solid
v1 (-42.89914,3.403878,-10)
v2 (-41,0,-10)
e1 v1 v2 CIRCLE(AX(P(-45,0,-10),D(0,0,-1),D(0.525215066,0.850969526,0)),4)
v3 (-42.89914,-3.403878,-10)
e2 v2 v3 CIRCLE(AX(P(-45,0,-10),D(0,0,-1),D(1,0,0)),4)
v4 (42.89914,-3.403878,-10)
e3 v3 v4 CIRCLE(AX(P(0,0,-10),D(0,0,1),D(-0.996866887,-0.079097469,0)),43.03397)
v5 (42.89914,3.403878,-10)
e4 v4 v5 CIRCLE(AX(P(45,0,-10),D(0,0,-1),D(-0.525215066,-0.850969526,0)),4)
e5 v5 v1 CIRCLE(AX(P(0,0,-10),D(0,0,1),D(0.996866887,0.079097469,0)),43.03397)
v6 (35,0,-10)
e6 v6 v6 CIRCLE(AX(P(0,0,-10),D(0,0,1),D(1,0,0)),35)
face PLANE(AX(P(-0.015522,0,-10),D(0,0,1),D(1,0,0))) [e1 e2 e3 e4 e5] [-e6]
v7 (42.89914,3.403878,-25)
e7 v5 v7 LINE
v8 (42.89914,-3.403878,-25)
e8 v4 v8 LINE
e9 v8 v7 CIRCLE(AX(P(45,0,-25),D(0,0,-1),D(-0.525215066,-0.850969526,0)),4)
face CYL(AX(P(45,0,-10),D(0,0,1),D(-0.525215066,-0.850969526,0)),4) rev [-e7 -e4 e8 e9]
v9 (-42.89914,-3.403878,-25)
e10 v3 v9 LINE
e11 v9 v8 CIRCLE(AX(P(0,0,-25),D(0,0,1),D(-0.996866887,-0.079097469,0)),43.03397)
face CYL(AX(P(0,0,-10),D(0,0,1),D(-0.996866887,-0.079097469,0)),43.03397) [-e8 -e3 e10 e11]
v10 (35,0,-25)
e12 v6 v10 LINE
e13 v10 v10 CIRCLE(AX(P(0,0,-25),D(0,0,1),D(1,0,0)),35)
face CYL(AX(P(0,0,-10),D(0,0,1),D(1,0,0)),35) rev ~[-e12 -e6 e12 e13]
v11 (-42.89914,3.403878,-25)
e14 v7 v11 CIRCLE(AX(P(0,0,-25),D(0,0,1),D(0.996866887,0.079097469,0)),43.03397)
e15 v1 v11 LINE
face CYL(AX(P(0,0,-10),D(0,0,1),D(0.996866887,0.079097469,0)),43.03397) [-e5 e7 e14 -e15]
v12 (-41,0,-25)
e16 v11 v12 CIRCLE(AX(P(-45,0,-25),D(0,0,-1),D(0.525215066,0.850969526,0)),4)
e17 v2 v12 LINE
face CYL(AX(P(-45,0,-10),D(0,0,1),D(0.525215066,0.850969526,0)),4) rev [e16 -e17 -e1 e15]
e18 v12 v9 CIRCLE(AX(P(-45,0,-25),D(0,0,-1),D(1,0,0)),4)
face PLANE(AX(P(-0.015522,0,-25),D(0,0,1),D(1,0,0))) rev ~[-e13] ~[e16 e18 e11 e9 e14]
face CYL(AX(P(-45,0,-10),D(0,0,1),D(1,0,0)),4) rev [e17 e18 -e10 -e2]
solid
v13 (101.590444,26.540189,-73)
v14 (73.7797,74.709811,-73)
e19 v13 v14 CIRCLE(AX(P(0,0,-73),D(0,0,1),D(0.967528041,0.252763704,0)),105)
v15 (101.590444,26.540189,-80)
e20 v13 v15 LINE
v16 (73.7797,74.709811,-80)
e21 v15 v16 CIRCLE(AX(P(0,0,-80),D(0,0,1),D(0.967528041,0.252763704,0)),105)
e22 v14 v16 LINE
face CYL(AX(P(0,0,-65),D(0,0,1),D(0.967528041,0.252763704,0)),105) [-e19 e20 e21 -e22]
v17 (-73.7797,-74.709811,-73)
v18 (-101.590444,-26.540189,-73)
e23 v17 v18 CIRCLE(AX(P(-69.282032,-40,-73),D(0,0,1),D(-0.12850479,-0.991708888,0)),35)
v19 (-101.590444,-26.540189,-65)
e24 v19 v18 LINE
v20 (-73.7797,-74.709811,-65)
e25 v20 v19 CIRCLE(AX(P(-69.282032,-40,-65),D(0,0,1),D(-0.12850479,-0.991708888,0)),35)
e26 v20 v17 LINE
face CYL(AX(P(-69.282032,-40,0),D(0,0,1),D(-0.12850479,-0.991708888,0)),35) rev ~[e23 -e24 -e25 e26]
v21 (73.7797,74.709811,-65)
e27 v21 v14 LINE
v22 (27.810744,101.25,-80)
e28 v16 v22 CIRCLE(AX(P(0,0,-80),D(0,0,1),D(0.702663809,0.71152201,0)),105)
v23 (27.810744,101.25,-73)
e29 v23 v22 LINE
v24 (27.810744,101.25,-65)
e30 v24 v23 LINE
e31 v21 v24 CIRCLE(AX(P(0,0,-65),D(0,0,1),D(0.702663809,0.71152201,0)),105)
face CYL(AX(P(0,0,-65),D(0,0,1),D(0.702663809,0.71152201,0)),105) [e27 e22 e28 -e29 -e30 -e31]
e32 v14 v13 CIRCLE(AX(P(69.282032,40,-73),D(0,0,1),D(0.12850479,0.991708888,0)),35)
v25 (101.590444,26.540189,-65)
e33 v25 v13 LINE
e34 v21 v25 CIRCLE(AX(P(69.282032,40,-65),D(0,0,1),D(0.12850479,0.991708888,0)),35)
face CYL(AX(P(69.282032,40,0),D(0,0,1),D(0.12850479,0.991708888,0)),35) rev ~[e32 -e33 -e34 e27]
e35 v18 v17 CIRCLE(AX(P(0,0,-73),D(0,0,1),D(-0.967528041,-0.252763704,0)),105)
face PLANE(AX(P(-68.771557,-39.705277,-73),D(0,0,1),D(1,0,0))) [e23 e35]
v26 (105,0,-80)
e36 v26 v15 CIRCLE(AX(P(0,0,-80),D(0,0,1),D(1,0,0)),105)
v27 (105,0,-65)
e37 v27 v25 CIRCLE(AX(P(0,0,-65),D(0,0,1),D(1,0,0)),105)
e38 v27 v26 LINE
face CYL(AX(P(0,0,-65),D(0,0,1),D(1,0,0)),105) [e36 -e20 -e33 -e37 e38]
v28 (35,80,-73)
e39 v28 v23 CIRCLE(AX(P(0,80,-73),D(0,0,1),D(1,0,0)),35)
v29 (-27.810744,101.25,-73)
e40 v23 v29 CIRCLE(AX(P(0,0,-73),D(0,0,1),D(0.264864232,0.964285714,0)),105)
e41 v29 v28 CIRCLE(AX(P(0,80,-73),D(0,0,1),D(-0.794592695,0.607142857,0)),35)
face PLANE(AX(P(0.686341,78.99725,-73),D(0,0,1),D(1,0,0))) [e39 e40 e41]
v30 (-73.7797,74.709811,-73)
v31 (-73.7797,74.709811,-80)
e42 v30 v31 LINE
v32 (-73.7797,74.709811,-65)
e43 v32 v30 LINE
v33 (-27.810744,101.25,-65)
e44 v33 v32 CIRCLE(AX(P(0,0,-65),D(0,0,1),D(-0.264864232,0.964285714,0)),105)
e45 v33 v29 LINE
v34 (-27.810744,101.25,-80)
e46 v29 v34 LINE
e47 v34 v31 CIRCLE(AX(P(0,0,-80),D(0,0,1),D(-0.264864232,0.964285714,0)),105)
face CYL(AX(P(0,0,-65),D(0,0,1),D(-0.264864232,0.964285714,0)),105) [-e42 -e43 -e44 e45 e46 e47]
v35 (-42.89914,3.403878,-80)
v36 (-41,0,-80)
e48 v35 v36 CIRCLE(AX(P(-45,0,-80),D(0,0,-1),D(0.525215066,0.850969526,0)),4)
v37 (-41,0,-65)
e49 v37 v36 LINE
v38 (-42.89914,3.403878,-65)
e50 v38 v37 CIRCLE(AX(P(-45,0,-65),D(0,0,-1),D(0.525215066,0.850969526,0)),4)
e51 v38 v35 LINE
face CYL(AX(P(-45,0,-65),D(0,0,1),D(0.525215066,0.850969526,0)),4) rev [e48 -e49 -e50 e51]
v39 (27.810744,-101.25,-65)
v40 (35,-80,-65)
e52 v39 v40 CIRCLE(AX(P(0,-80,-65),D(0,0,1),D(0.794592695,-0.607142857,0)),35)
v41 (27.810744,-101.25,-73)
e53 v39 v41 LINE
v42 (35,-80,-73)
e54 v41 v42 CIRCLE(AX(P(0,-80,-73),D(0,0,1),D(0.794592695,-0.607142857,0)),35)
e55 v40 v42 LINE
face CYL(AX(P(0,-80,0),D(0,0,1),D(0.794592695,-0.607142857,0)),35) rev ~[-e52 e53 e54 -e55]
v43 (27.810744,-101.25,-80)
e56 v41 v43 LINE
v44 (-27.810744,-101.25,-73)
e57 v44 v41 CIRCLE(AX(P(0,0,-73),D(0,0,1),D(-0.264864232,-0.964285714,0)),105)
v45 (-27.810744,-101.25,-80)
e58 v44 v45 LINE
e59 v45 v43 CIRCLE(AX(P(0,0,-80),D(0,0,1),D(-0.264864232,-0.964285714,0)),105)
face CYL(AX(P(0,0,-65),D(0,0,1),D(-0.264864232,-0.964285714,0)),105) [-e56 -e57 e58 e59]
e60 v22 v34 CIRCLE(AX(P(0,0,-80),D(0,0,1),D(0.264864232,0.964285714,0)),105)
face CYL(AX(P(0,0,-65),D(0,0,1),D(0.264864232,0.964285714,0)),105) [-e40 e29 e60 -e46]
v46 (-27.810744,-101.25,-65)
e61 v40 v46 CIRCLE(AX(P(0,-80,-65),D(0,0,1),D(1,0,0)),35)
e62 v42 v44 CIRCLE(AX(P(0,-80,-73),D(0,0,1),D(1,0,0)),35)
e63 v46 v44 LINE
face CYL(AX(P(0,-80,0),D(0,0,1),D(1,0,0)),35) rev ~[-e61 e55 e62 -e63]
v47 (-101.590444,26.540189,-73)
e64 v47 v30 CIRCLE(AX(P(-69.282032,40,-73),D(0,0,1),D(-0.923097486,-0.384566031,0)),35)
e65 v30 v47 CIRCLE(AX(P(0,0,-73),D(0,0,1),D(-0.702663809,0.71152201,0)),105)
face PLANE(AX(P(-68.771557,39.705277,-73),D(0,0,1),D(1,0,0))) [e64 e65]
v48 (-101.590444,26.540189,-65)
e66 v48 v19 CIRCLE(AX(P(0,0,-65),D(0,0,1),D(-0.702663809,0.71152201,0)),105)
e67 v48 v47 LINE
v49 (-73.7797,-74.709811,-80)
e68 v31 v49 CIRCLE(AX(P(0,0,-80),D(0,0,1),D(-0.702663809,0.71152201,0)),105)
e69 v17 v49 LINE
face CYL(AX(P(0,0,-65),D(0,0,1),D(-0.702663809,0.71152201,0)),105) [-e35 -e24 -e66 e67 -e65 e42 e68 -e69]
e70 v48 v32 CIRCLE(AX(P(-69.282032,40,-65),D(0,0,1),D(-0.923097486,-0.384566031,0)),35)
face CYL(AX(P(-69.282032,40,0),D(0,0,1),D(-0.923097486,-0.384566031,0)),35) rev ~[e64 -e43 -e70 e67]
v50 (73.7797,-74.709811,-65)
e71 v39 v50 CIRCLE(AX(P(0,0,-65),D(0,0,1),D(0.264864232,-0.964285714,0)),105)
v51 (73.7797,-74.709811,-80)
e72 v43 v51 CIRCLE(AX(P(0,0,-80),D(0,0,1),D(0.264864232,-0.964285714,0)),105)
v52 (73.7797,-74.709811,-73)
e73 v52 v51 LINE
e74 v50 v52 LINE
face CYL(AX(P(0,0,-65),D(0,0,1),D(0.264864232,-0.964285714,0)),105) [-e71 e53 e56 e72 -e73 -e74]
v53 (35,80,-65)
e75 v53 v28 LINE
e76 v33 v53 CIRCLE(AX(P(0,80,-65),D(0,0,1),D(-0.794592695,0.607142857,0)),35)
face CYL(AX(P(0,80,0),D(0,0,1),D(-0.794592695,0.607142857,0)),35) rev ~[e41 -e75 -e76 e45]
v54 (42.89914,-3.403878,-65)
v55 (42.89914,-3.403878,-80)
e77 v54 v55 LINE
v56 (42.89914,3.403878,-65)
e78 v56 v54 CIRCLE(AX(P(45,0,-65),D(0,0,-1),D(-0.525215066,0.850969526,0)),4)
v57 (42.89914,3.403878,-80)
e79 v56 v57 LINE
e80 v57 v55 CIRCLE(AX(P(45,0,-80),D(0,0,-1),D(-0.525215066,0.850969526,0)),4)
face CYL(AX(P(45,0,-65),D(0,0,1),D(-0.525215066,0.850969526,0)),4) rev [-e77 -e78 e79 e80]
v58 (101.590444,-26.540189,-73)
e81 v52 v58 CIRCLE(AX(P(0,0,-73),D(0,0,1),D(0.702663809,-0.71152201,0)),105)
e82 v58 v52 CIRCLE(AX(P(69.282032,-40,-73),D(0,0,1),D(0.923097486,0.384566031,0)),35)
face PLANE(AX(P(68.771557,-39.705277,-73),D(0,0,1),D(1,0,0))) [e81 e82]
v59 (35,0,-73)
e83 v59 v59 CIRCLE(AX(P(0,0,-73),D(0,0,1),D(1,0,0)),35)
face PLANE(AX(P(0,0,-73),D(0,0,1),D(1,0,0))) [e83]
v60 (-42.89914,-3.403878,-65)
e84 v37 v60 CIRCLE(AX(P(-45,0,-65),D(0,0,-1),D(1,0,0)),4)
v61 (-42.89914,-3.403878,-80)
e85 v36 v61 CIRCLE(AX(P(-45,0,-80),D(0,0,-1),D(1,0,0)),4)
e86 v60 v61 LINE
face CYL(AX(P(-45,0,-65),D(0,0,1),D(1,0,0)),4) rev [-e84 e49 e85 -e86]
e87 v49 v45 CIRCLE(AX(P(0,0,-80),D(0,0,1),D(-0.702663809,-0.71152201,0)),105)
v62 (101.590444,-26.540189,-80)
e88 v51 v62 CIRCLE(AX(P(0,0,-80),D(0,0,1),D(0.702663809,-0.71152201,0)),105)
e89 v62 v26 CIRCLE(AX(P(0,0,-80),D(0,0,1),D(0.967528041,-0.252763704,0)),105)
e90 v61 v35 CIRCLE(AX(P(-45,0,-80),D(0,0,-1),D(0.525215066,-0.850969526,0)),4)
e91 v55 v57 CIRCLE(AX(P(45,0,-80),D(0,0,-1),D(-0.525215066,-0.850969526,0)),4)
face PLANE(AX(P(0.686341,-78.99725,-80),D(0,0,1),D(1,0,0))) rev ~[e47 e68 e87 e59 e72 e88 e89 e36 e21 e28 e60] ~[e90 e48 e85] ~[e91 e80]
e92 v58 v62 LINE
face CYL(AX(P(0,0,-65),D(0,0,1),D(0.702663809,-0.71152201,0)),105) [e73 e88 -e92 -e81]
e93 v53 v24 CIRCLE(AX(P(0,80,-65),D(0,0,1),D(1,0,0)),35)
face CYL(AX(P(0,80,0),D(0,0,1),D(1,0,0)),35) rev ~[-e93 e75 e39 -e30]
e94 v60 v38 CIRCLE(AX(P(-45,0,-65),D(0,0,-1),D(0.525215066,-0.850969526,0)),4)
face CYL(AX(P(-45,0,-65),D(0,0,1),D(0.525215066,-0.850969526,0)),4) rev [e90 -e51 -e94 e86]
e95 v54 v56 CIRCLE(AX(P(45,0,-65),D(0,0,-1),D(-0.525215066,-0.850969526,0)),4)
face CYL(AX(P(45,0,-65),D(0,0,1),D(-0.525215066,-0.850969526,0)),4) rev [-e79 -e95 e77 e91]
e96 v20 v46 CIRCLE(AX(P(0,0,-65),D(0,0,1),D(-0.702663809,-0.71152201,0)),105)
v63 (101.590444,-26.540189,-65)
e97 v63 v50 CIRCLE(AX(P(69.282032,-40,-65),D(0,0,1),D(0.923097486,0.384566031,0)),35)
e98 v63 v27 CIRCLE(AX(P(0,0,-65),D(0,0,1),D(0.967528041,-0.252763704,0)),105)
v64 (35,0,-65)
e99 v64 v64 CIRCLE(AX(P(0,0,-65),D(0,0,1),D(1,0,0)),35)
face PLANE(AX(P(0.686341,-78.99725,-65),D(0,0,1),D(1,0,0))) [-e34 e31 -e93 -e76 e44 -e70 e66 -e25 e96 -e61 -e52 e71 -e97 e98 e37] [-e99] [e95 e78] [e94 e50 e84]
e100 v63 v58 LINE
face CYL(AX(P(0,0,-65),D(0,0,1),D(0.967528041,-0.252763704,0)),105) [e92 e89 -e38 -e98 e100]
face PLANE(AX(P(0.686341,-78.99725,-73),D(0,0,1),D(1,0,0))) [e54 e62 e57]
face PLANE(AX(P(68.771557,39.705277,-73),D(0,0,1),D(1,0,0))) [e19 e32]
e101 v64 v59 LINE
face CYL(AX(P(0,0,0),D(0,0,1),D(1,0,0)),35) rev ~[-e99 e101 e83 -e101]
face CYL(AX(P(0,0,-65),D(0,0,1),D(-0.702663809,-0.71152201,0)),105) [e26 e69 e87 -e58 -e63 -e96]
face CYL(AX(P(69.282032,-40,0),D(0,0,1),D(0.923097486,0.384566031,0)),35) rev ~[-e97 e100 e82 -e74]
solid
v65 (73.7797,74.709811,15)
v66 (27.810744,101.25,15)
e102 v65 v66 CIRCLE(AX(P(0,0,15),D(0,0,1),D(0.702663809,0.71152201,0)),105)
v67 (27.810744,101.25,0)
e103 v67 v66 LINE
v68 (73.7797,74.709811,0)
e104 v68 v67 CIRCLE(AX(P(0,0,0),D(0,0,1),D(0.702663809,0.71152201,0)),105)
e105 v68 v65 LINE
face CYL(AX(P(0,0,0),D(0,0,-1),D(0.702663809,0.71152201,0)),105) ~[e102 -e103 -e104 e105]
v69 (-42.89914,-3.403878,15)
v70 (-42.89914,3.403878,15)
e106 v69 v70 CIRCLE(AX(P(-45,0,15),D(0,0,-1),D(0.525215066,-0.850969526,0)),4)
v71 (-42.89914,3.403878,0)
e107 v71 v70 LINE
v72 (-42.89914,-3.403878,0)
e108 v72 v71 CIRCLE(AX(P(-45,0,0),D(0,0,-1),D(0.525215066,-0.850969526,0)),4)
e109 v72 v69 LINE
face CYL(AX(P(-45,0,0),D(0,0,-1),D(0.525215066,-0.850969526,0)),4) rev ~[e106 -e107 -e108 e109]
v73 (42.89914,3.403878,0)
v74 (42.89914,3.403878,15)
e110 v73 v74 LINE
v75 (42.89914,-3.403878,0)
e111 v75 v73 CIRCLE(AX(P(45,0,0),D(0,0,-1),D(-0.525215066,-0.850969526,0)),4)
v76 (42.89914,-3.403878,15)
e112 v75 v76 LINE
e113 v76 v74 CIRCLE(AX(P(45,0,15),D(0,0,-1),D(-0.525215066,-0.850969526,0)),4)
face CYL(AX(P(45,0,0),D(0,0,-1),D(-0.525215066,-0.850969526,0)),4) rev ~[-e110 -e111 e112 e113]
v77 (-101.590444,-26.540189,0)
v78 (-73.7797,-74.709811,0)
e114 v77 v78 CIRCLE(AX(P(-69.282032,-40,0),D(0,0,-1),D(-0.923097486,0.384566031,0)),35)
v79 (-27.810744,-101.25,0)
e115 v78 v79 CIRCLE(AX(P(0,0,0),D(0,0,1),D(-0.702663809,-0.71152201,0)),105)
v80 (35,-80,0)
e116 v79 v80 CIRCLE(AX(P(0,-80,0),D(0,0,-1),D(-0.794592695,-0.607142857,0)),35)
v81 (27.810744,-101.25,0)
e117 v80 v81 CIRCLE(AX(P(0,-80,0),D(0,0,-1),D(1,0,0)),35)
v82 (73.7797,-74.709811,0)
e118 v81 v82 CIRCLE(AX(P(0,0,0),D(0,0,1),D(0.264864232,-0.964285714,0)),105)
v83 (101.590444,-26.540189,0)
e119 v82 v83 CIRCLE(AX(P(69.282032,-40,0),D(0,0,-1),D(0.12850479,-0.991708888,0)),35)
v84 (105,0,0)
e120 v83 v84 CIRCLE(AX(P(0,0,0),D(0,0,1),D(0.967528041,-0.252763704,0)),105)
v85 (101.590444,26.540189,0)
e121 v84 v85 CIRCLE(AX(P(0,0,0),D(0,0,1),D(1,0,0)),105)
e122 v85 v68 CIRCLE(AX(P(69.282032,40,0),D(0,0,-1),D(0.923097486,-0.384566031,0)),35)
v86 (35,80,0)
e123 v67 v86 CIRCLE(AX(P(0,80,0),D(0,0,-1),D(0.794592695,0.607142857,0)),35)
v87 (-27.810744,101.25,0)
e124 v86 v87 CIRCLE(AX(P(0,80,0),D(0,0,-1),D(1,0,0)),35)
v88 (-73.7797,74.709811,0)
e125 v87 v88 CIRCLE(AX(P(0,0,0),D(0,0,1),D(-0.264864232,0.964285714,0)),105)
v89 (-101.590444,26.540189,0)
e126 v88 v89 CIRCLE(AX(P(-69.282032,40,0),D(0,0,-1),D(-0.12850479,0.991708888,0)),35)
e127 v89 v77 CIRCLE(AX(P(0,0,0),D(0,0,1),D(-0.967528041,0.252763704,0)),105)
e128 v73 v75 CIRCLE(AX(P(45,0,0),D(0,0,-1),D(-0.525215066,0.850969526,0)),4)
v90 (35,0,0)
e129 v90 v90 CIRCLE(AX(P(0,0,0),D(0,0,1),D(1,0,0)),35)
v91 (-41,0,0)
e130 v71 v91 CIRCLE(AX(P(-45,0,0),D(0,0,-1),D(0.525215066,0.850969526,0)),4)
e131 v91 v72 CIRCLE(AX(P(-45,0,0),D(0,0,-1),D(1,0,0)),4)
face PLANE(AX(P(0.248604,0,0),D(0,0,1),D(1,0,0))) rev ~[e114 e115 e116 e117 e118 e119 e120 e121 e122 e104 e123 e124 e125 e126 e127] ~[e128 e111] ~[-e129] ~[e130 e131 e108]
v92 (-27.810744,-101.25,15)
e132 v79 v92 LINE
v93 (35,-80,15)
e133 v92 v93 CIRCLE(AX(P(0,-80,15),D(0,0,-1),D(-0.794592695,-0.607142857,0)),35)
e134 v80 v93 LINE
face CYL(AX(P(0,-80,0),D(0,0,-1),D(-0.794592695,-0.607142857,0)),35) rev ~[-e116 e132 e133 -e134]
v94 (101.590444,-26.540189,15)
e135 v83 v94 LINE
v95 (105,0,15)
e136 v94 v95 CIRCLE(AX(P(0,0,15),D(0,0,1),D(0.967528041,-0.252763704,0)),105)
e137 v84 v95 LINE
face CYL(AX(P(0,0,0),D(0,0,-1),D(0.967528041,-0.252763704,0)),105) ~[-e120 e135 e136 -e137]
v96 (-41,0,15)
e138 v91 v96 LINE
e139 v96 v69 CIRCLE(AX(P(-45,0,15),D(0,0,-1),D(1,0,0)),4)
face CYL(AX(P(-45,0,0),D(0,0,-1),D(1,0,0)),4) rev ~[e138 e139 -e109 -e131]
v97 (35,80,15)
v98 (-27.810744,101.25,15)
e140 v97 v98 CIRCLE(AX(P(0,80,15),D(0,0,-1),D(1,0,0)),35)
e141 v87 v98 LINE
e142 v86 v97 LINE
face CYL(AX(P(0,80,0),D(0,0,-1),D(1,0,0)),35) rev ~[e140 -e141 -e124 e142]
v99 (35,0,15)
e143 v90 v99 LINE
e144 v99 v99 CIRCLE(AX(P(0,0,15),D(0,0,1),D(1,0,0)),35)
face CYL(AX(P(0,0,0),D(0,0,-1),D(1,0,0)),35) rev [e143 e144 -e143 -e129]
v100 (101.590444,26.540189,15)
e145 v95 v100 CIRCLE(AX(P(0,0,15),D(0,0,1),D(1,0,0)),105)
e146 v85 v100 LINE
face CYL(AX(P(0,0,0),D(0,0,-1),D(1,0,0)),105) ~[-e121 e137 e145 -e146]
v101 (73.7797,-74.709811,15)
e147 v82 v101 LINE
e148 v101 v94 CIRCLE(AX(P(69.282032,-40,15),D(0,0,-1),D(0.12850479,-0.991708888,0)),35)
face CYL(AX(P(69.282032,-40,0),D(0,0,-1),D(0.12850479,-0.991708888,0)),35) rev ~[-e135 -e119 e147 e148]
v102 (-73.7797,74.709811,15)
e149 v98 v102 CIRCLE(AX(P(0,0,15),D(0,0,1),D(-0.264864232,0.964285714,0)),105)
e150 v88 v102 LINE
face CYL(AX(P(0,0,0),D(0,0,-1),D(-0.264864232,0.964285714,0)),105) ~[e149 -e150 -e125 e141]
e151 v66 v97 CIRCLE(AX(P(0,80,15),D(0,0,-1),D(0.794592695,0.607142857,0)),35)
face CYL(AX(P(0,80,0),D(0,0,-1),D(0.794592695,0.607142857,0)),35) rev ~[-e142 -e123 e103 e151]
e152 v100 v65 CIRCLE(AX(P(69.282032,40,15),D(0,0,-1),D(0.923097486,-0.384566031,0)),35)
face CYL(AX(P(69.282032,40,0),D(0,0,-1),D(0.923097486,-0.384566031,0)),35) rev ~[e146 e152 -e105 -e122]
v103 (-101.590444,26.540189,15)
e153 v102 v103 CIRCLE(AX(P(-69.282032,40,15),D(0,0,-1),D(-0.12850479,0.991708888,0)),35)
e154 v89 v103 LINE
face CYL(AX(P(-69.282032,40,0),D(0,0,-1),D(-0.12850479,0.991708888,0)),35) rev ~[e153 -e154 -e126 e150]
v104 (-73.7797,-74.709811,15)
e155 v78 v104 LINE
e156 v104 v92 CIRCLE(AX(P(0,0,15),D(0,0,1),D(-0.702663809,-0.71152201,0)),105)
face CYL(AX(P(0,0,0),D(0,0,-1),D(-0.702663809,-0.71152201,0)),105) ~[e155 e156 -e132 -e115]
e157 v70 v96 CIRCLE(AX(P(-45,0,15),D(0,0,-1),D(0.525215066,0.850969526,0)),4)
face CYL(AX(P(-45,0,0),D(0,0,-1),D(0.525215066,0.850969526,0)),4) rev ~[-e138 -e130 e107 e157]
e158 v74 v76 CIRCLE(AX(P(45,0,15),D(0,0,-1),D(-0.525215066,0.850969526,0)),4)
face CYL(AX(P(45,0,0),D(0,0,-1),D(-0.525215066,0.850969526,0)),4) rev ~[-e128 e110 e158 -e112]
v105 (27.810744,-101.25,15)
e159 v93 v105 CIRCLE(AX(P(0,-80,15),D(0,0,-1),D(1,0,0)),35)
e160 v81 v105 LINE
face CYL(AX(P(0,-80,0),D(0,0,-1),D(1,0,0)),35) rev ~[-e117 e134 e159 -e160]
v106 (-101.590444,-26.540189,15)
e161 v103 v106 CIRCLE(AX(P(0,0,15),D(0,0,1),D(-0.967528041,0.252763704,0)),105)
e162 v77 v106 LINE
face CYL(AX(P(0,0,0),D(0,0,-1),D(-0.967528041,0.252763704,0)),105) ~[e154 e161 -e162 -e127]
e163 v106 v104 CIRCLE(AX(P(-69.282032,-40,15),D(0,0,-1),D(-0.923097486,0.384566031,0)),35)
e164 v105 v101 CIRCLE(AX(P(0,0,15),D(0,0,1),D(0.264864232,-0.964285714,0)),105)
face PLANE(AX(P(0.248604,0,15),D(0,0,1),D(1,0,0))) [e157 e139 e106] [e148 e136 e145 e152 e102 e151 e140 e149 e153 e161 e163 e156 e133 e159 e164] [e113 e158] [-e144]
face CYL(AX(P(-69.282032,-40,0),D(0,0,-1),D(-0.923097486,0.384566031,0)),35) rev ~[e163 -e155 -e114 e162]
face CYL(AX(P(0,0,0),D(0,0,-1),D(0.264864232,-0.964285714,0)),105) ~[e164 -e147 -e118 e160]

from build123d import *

# Parameters (mm, degrees)
F0_R     = 35
F1_DEPTH = 15
F2_START = -65
F2_DEPTH = 15
F3_DEPTH = 73
F4_START = -10
F4_DEPTH = 15


with BuildPart() as f1:
    # F0 (on Top) → F1 (new body)
    with BuildSketch(Plane.XY):
        with BuildLine():
            ThreePointArc((-27.8107443266, -101.25), (-11.2165937024, -46.8459953291), (35, -80))
            ThreePointArc((35, -80), (33.1540046709, -91.2165937024), (27.8107443266, -101.25))
            ThreePointArc((27.8107443266, -101.25), (52.5, -90.9326673974), (73.7796999699, -74.709811085))
            ThreePointArc((73.7796999699, -74.709811085), (38.9711431703, -22.5), (101.5904442965, -26.540188915))
            ThreePointArc((101.5904442965, -26.540188915), (104.1441228566, -13.3791507367), (105, 0))
            ThreePointArc((105, 0), (104.1441228566, 13.3791507367), (101.5904442965, 26.540188915))
            ThreePointArc((101.5904442965, 26.540188915), (38.9711431703, 22.5), (73.7796999699, 74.709811085))
            ThreePointArc((73.7796999699, 74.709811085), (52.5, 90.9326673974), (27.8107443266, 101.25))
            ThreePointArc((27.8107443266, 101.25), (33.1540046709, 91.2165937024), (35, 80))
            ThreePointArc((35, 80), (-11.2165937024, 46.8459953291), (-27.8107443266, 101.25))
            ThreePointArc((-27.8107443266, 101.25), (-52.5, 90.9326673974), (-73.7796999699, 74.709811085))
            ThreePointArc((-73.7796999699, 74.709811085), (-46.1781188718, 66.2908574256), (-34.2820323028, 40))
            ThreePointArc((-34.2820323028, 40), (-62.4188850575, 5.6794928667), (-101.5904442965, 26.540188915))
            ThreePointArc((-101.5904442965, 26.540188915), (-105, 0), (-101.5904442965, -26.540188915))
            ThreePointArc((-101.5904442965, -26.540188915), (-62.4188850575, -5.6794928667), (-34.2820323028, -40))
            ThreePointArc((-34.2820323028, -40), (-46.1781188718, -66.2908574256), (-73.7796999699, -74.709811085))
            ThreePointArc((-73.7796999699, -74.709811085), (-52.5, -90.9326673974), (-27.8107443266, -101.25))
        make_face()
        with BuildLine():
            ThreePointArc((-42.8991397367, -3.403878105), (-49, 0), (-42.8991397367, 3.403878105))
            ThreePointArc((-42.8991397367, 3.403878105), (0, 43.0339700272), (42.8991397367, 3.403878105))
            ThreePointArc((42.8991397367, 3.403878105), (46.9489175132, 3.4930961233), (49, 0))
            ThreePointArc((49, 0), (46.9489175132, -3.4930961233), (42.8991397367, -3.403878105))
            ThreePointArc((42.8991397367, -3.403878105), (0, -43.0339700272), (-42.8991397367, -3.403878105))
        make_face(mode=Mode.SUBTRACT)
        with BuildLine():
            ThreePointArc((-42.8991397367, 3.403878105), (-41.5069038767, 1.9489175132), (-41, 0))
            ThreePointArc((-41, 0), (-41.5069038767, -1.9489175132), (-42.8991397367, -3.403878105))
            ThreePointArc((-42.8991397367, -3.403878105), (0, -43.0339700272), (42.8991397367, -3.403878105))
            ThreePointArc((42.8991397367, -3.403878105), (41, 0), (42.8991397367, 3.403878105))
            ThreePointArc((42.8991397367, 3.403878105), (0, 43.0339700272), (-42.8991397367, 3.403878105))
        make_face()
        Circle(F0_R, mode=Mode.SUBTRACT)
    extrude(amount=F1_DEPTH)


with BuildPart() as f2:
    # F0 (on Top) → F2 (new body)
    with BuildSketch(Plane.XY.offset(F2_START)):
        with BuildLine():
            ThreePointArc((27.8107443266, -101.25), (33.1540046709, -91.2165937024), (35, -80))
            ThreePointArc((35, -80), (-11.2165937024, -46.8459953291), (-27.8107443266, -101.25))
            ThreePointArc((-27.8107443266, -101.25), (0, -105), (27.8107443266, -101.25))
        make_face()
        with BuildLine():
            ThreePointArc((-27.8107443266, -101.25), (-11.2165937024, -46.8459953291), (35, -80))
            ThreePointArc((35, -80), (33.1540046709, -91.2165937024), (27.8107443266, -101.25))
            ThreePointArc((27.8107443266, -101.25), (52.5, -90.9326673974), (73.7796999699, -74.709811085))
            ThreePointArc((73.7796999699, -74.709811085), (38.9711431703, -22.5), (101.5904442965, -26.540188915))
            ThreePointArc((101.5904442965, -26.540188915), (104.1441228566, -13.3791507367), (105, 0))
            ThreePointArc((105, 0), (104.1441228566, 13.3791507367), (101.5904442965, 26.540188915))
            ThreePointArc((101.5904442965, 26.540188915), (38.9711431703, 22.5), (73.7796999699, 74.709811085))
            ThreePointArc((73.7796999699, 74.709811085), (52.5, 90.9326673974), (27.8107443266, 101.25))
            ThreePointArc((27.8107443266, 101.25), (33.1540046709, 91.2165937024), (35, 80))
            ThreePointArc((35, 80), (-11.2165937024, 46.8459953291), (-27.8107443266, 101.25))
            ThreePointArc((-27.8107443266, 101.25), (-52.5, 90.9326673974), (-73.7796999699, 74.709811085))
            ThreePointArc((-73.7796999699, 74.709811085), (-46.1781188718, 66.2908574256), (-34.2820323028, 40))
            ThreePointArc((-34.2820323028, 40), (-62.4188850575, 5.6794928667), (-101.5904442965, 26.540188915))
            ThreePointArc((-101.5904442965, 26.540188915), (-105, 0), (-101.5904442965, -26.540188915))
            ThreePointArc((-101.5904442965, -26.540188915), (-62.4188850575, -5.6794928667), (-34.2820323028, -40))
            ThreePointArc((-34.2820323028, -40), (-46.1781188718, -66.2908574256), (-73.7796999699, -74.709811085))
            ThreePointArc((-73.7796999699, -74.709811085), (-52.5, -90.9326673974), (-27.8107443266, -101.25))
        make_face()
        with BuildLine():
            ThreePointArc((-42.8991397367, -3.403878105), (-49, 0), (-42.8991397367, 3.403878105))
            ThreePointArc((-42.8991397367, 3.403878105), (0, 43.0339700272), (42.8991397367, 3.403878105))
            ThreePointArc((42.8991397367, 3.403878105), (46.9489175132, 3.4930961233), (49, 0))
            ThreePointArc((49, 0), (46.9489175132, -3.4930961233), (42.8991397367, -3.403878105))
            ThreePointArc((42.8991397367, -3.403878105), (0, -43.0339700272), (-42.8991397367, -3.403878105))
        make_face(mode=Mode.SUBTRACT)
        with BuildLine():
            ThreePointArc((-101.5904442965, -26.540188915), (-90.9326673974, -52.5), (-73.7796999699, -74.709811085))
            ThreePointArc((-73.7796999699, -74.709811085), (-46.1781188718, -66.2908574256), (-34.2820323028, -40))
            ThreePointArc((-34.2820323028, -40), (-62.4188850575, -5.6794928667), (-101.5904442965, -26.540188915))
        make_face()
        with BuildLine():
            ThreePointArc((101.5904442965, -26.540188915), (38.9711431703, -22.5), (73.7796999699, -74.709811085))
            ThreePointArc((73.7796999699, -74.709811085), (90.9326673974, -52.5), (101.5904442965, -26.540188915))
        make_face()
        with BuildLine():
            ThreePointArc((-73.7796999699, 74.709811085), (-90.9326673974, 52.5), (-101.5904442965, 26.540188915))
            ThreePointArc((-101.5904442965, 26.540188915), (-62.4188850575, 5.6794928667), (-34.2820323028, 40))
            ThreePointArc((-34.2820323028, 40), (-46.1781188718, 66.2908574256), (-73.7796999699, 74.709811085))
        make_face()
        with BuildLine():
            ThreePointArc((73.7796999699, 74.709811085), (38.9711431703, 22.5), (101.5904442965, 26.540188915))
            ThreePointArc((101.5904442965, 26.540188915), (90.9326673974, 52.5), (73.7796999699, 74.709811085))
        make_face()
        with BuildLine():
            ThreePointArc((27.8107443266, 101.25), (0, 105), (-27.8107443266, 101.25))
            ThreePointArc((-27.8107443266, 101.25), (-11.2165937024, 46.8459953291), (35, 80))
            ThreePointArc((35, 80), (33.1540046709, 91.2165937024), (27.8107443266, 101.25))
        make_face()
        with BuildLine():
            ThreePointArc((-42.8991397367, 3.403878105), (-41.5069038767, 1.9489175132), (-41, 0))
            ThreePointArc((-41, 0), (-41.5069038767, -1.9489175132), (-42.8991397367, -3.403878105))
            ThreePointArc((-42.8991397367, -3.403878105), (0, -43.0339700272), (42.8991397367, -3.403878105))
            ThreePointArc((42.8991397367, -3.403878105), (41, 0), (42.8991397367, 3.403878105))
            ThreePointArc((42.8991397367, 3.403878105), (0, 43.0339700272), (-42.8991397367, 3.403878105))
        make_face()
        Circle(F0_R, mode=Mode.SUBTRACT)
        Circle(F0_R)
    extrude(amount=-F2_DEPTH)

    # F0 (on Top) → F3 (cut)
    with BuildSketch(Plane.XY):
        with BuildLine():
            ThreePointArc((-101.5904442965, -26.540188915), (-90.9326673974, -52.5), (-73.7796999699, -74.709811085))
            ThreePointArc((-73.7796999699, -74.709811085), (-46.1781188718, -66.2908574256), (-34.2820323028, -40))
            ThreePointArc((-34.2820323028, -40), (-62.4188850575, -5.6794928667), (-101.5904442965, -26.540188915))
        make_face()
        with BuildLine():
            ThreePointArc((-73.7796999699, 74.709811085), (-90.9326673974, 52.5), (-101.5904442965, 26.540188915))
            ThreePointArc((-101.5904442965, 26.540188915), (-62.4188850575, 5.6794928667), (-34.2820323028, 40))
            ThreePointArc((-34.2820323028, 40), (-46.1781188718, 66.2908574256), (-73.7796999699, 74.709811085))
        make_face()
        with BuildLine():
            ThreePointArc((27.8107443266, 101.25), (0, 105), (-27.8107443266, 101.25))
            ThreePointArc((-27.8107443266, 101.25), (-11.2165937024, 46.8459953291), (35, 80))
            ThreePointArc((35, 80), (33.1540046709, 91.2165937024), (27.8107443266, 101.25))
        make_face()
        with BuildLine():
            ThreePointArc((73.7796999699, 74.709811085), (38.9711431703, 22.5), (101.5904442965, 26.540188915))
            ThreePointArc((101.5904442965, 26.540188915), (90.9326673974, 52.5), (73.7796999699, 74.709811085))
        make_face()
        with BuildLine():
            ThreePointArc((27.8107443266, -101.25), (33.1540046709, -91.2165937024), (35, -80))
            ThreePointArc((35, -80), (-11.2165937024, -46.8459953291), (-27.8107443266, -101.25))
            ThreePointArc((-27.8107443266, -101.25), (0, -105), (27.8107443266, -101.25))
        make_face()
        with BuildLine():
            ThreePointArc((101.5904442965, -26.540188915), (38.9711431703, -22.5), (73.7796999699, -74.709811085))
            ThreePointArc((73.7796999699, -74.709811085), (90.9326673974, -52.5), (101.5904442965, -26.540188915))
        make_face()
        Circle(F0_R)
    extrude(amount=-F3_DEPTH, mode=Mode.SUBTRACT)


with BuildPart() as f4:
    # F0 (on Top) → F4 (new body)
    with BuildSketch(Plane.XY.offset(F4_START)):
        with BuildLine():
            ThreePointArc((-42.8991397367, 3.403878105), (-41.5069038767, 1.9489175132), (-41, 0))
            ThreePointArc((-41, 0), (-41.5069038767, -1.9489175132), (-42.8991397367, -3.403878105))
            ThreePointArc((-42.8991397367, -3.403878105), (0, -43.0339700272), (42.8991397367, -3.403878105))
            ThreePointArc((42.8991397367, -3.403878105), (41, 0), (42.8991397367, 3.403878105))
            ThreePointArc((42.8991397367, 3.403878105), (0, 43.0339700272), (-42.8991397367, 3.403878105))
        make_face()
        Circle(F0_R, mode=Mode.SUBTRACT)
    extrude(amount=-F4_DEPTH)


solid = Compound([f1.part, f2.part, f4.part])
